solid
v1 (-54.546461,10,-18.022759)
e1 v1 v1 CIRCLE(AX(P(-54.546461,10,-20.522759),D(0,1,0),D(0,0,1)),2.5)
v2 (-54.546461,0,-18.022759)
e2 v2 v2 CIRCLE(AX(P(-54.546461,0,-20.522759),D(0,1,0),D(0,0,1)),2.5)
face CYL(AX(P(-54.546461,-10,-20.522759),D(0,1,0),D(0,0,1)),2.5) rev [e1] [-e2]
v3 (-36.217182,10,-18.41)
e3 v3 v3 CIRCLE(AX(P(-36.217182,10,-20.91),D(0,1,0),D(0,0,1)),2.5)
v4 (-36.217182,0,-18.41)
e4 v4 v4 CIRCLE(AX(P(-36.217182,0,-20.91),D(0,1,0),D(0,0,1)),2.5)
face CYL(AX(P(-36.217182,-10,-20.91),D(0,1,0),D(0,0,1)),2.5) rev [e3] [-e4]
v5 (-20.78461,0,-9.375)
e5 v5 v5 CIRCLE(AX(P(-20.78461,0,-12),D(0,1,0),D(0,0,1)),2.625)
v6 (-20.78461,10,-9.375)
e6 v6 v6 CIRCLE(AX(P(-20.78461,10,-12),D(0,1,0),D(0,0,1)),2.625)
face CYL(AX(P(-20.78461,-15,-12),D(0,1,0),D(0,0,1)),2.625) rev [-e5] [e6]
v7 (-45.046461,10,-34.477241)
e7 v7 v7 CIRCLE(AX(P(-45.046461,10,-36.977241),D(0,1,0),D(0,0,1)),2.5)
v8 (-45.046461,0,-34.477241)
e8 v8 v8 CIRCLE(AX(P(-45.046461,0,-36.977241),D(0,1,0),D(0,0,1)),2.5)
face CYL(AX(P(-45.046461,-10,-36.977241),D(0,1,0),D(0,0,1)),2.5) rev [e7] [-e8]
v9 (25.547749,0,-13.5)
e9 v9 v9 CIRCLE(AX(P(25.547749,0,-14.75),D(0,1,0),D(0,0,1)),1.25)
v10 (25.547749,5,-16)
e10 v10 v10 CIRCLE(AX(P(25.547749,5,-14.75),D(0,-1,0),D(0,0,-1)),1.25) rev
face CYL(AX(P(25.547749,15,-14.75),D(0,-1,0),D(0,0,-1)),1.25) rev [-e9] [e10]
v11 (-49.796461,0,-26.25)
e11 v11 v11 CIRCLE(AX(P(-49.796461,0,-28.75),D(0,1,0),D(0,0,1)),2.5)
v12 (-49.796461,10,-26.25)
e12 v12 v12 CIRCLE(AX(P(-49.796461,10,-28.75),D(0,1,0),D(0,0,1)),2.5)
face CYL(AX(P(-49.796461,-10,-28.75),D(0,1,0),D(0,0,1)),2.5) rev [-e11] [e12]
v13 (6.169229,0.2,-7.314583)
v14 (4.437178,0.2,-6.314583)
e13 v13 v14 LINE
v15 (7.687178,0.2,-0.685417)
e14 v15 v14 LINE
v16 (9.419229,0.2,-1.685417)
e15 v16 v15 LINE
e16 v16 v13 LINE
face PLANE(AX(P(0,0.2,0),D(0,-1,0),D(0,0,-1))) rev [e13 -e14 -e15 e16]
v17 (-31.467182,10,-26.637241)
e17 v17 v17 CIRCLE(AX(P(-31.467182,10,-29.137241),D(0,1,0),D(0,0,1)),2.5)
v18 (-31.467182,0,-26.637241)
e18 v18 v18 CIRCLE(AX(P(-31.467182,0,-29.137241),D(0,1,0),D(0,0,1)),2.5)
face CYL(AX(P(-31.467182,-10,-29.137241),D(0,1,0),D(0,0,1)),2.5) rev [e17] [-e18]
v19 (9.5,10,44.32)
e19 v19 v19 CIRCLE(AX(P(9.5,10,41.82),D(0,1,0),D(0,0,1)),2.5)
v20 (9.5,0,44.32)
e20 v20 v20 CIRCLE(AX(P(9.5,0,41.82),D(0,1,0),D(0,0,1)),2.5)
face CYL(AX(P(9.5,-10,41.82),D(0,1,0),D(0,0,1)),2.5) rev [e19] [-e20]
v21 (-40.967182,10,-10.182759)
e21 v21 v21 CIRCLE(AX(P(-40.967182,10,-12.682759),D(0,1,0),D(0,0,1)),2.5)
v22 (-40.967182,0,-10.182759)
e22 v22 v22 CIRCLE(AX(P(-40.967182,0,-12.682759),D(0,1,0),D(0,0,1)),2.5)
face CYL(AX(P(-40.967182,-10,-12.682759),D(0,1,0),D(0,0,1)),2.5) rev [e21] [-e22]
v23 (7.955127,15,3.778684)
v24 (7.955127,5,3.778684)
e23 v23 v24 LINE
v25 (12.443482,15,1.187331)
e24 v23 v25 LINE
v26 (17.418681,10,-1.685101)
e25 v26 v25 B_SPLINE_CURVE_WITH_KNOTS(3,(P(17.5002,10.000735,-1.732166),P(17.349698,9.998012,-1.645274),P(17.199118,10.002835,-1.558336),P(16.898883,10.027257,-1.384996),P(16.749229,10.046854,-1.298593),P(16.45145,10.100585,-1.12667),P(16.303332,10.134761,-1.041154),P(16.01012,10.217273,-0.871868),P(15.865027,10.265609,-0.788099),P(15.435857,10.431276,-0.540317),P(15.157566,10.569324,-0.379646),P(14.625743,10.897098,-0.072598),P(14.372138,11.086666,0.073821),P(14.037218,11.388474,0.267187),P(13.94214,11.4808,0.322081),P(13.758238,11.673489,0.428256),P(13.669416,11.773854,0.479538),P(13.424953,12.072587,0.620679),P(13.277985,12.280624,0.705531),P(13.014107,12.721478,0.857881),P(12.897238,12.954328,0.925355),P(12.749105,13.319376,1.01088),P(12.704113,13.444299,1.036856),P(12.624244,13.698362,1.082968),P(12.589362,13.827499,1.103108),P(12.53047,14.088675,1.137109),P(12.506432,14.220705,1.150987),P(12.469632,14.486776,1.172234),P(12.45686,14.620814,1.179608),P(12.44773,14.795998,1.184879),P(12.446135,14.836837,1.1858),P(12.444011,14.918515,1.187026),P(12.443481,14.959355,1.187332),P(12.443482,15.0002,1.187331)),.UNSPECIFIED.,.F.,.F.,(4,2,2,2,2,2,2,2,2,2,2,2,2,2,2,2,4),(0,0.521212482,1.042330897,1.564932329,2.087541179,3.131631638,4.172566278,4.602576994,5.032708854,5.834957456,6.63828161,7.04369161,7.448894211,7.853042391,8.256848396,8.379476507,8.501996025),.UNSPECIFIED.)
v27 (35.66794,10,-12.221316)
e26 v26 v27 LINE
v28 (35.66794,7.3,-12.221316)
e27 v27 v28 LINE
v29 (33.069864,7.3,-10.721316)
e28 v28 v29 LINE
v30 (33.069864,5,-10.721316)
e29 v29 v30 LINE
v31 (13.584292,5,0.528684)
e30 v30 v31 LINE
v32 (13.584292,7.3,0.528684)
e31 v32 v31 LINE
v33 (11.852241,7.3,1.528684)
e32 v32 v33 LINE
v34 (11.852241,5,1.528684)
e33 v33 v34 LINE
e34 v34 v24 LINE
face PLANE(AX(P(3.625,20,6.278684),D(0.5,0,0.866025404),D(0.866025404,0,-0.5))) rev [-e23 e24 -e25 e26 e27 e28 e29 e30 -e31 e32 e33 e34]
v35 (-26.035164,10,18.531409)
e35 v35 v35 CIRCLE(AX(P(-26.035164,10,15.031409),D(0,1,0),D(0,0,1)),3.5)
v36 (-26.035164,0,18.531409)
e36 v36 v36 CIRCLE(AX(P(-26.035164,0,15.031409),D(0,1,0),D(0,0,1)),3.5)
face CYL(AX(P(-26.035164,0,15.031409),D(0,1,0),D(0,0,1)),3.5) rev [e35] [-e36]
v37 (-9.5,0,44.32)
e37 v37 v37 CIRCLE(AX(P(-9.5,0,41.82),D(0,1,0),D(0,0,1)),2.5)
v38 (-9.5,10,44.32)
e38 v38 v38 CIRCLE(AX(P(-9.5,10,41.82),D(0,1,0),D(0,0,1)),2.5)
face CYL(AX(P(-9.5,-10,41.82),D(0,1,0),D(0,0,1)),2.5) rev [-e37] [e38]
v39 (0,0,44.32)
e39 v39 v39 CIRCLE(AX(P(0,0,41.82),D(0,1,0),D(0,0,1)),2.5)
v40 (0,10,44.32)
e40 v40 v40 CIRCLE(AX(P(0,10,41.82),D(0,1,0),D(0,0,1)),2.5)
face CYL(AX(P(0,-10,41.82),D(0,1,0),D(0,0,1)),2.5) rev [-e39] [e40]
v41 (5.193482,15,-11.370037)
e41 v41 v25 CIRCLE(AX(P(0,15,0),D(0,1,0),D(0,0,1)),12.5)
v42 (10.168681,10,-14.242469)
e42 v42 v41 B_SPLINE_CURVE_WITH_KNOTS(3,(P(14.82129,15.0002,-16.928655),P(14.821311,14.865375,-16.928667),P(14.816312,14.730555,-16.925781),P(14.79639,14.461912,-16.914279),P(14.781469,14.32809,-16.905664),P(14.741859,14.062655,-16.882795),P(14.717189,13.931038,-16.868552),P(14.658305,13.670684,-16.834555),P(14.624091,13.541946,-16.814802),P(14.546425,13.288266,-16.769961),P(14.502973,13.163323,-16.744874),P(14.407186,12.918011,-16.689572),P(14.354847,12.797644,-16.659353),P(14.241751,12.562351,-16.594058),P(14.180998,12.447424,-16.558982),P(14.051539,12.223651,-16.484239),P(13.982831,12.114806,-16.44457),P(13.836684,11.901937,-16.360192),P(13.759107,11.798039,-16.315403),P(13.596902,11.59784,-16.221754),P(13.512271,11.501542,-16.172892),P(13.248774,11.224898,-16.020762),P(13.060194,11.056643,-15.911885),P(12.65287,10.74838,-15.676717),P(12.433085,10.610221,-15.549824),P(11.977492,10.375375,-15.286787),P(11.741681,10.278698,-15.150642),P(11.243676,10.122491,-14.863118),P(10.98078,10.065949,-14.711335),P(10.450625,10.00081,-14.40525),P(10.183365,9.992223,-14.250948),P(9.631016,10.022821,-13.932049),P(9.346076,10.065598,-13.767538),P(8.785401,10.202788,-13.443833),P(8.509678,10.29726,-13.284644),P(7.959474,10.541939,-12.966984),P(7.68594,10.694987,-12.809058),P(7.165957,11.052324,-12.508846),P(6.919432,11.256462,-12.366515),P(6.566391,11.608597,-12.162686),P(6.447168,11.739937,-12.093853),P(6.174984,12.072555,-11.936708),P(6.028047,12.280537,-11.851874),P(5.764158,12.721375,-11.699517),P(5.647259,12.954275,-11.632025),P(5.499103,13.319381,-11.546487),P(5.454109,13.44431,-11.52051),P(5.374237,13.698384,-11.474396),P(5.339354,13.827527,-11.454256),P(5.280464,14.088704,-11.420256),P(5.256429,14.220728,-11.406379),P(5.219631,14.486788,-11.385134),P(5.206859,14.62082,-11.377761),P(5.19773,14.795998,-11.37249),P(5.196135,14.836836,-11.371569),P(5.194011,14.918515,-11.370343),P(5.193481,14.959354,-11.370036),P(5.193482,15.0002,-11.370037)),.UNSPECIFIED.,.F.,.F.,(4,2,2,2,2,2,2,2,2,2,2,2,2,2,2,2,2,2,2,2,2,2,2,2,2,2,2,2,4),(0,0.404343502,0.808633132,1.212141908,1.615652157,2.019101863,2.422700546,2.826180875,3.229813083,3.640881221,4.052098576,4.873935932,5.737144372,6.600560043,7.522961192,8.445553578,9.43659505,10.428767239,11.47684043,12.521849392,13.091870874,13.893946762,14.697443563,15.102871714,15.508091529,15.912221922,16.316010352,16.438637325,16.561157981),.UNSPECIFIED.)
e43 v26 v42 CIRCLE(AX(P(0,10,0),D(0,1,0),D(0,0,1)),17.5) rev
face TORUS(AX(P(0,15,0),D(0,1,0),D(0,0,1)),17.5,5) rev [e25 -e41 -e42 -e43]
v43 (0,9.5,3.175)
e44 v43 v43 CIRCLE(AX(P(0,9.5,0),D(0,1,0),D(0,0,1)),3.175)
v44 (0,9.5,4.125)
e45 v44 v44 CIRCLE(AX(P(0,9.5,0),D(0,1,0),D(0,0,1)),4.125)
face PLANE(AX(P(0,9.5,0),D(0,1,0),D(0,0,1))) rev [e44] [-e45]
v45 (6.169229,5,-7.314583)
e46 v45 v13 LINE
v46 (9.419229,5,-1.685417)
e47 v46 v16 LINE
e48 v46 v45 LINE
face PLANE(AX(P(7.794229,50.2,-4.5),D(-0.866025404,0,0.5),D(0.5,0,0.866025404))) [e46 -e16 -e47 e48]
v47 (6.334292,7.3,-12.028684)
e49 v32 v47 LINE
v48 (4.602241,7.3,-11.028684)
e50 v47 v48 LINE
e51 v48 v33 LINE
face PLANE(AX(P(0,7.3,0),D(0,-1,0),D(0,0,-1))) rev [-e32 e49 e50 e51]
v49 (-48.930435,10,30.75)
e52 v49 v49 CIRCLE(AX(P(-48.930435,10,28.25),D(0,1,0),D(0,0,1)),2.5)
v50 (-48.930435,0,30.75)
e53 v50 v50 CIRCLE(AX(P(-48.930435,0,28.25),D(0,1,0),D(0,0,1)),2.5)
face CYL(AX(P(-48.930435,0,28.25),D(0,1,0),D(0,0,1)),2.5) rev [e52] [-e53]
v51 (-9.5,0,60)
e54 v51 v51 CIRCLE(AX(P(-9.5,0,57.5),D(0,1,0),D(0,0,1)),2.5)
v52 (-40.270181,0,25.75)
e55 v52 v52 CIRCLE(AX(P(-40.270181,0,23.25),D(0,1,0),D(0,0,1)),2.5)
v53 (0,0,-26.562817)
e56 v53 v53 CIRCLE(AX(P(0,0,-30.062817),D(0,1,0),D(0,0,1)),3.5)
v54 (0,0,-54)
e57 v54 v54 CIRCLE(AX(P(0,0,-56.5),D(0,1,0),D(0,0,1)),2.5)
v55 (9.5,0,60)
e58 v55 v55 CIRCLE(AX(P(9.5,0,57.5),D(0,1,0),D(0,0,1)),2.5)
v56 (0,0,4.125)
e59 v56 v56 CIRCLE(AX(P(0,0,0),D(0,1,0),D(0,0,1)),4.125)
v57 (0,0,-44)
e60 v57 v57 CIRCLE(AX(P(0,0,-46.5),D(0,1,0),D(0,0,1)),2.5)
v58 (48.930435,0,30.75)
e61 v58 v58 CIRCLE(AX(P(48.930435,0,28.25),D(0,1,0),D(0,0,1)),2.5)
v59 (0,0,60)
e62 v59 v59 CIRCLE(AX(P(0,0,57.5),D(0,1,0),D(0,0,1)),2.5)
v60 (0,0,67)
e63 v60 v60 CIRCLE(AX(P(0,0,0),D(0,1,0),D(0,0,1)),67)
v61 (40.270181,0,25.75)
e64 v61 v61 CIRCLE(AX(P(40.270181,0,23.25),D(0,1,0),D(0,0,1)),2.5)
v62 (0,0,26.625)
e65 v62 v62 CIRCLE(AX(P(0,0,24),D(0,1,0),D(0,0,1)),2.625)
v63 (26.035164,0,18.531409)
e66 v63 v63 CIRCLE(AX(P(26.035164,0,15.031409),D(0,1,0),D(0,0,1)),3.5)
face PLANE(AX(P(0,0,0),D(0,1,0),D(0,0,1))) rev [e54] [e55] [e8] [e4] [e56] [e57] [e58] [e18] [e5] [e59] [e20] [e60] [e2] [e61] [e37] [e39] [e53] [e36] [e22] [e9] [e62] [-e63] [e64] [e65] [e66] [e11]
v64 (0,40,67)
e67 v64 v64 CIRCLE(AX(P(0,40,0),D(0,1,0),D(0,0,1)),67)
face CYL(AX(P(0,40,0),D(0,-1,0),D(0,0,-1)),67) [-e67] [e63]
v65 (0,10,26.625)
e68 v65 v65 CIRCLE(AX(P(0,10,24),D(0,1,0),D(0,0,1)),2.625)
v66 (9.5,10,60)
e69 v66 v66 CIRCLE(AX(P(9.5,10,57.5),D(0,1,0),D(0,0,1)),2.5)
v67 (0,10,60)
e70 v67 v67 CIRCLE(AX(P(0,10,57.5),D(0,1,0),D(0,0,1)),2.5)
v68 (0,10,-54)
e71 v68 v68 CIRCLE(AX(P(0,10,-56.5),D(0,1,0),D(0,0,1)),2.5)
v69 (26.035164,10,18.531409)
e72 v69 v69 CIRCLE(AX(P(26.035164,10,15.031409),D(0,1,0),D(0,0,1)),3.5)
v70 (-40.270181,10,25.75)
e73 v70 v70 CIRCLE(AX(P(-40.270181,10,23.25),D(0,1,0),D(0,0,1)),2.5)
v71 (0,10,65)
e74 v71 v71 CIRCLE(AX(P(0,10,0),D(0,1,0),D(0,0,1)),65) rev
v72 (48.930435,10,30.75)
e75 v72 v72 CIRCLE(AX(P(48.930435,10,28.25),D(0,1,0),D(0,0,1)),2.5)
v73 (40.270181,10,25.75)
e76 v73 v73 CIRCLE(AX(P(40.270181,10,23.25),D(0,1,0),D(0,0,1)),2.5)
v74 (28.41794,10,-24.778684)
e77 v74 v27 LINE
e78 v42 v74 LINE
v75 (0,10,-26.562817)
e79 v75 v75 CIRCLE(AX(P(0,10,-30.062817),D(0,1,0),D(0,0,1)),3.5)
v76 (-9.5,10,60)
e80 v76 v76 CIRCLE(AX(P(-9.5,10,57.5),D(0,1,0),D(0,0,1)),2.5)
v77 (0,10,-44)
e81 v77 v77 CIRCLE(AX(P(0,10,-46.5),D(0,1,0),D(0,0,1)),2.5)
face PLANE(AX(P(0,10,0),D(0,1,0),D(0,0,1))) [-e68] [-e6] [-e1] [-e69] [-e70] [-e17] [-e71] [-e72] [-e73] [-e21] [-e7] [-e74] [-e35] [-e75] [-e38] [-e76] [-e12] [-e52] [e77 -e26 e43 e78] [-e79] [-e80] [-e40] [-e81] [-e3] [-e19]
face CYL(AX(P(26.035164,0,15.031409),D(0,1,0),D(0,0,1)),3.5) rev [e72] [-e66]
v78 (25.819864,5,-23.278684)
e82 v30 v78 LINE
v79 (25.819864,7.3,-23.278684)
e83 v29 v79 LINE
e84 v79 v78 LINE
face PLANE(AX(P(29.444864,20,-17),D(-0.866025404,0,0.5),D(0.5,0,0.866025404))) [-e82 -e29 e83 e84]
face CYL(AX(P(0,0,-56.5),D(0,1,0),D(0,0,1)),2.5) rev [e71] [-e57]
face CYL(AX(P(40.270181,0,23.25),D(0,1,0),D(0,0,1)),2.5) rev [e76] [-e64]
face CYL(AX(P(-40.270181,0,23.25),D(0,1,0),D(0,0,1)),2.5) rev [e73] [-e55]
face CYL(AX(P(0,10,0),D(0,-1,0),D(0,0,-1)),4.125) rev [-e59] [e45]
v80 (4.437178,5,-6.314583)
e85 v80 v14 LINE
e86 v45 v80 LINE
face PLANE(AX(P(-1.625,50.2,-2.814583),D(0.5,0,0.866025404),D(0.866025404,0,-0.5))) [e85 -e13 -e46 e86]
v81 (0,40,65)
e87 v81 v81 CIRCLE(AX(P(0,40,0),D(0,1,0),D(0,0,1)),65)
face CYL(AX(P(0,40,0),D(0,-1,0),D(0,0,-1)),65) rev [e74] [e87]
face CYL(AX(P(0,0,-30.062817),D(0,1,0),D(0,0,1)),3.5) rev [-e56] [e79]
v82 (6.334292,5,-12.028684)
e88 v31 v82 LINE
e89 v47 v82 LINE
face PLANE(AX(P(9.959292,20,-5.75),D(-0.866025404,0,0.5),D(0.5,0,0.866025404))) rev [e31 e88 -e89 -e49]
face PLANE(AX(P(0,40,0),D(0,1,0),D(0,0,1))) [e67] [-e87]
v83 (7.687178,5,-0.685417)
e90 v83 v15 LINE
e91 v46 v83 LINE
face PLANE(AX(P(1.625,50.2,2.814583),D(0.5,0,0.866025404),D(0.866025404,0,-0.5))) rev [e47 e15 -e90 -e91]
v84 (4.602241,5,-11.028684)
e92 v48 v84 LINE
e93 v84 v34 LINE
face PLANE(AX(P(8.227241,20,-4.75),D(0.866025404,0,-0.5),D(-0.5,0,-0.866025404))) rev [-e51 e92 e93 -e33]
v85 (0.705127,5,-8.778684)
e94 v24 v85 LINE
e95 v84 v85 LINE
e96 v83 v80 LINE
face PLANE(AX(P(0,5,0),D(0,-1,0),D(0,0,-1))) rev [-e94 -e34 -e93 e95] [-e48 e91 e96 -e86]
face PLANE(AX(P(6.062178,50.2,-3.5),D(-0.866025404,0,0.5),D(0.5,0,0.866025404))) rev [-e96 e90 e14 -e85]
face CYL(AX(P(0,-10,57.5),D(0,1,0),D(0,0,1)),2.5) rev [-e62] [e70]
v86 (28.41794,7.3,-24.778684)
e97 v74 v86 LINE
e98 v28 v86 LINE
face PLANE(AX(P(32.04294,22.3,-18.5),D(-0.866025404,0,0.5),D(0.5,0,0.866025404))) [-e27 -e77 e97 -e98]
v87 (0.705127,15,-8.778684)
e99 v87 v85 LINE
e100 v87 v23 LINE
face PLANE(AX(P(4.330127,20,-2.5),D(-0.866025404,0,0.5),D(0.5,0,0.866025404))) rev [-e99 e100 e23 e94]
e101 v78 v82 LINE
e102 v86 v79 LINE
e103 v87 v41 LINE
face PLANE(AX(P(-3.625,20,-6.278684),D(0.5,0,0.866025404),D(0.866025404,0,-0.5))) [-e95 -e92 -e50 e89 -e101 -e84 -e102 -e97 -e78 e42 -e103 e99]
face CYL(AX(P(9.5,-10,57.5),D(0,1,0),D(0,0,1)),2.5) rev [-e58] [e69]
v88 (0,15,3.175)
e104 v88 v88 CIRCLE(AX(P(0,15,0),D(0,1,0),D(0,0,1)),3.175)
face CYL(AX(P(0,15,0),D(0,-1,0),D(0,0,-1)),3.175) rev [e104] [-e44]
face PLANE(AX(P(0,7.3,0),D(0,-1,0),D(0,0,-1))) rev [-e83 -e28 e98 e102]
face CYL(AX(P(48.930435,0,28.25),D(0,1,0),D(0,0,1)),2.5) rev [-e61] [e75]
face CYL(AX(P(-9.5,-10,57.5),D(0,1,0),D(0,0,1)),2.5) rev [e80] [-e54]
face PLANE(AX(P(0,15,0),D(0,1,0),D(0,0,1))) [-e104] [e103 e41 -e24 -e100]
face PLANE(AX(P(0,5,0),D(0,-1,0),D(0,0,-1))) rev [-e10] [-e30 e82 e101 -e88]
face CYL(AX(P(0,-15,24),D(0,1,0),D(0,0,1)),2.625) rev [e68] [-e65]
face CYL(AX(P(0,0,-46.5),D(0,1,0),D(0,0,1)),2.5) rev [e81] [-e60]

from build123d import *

# Parameters (mm, degrees)
BOSS_EXTRUDE7_DEPTH  = 10
SKETCH1_23_R         = 65.000000017
SKETCH1_23_R_2       = 4.125
BOSS_EXTRUDE8_DEPTH  = 10
CUT_EXTRUDE1_START   = 65
SKETCH16_R           = 2.5
CUT_EXTRUDE1_DEPTH   = 20
BOSS_EXTRUDE9_START  = -0.5
SKETCH17_R           = 12.5
SKETCH17_R_2         = 3.175
BOSS_EXTRUDE9_DEPTH  = 5.5
FILLET1_R            = 5
SKETCH18_R           = 2.5
SKETCH18_R_2         = 3.5
CUT_EXTRUDE2_DEPTH   = 10
SKETCH20_R           = 2.625
CUT_EXTRUDE11_DEPTH  = 25
SKETCH1_24_R         = 67
SKETCH1_24_R_2       = 66.5
BOSS_EXTRUDE10_DEPTH = 40
CUT_EXTRUDE12_START  = -0.2
CUT_EXTRUDE12_DEPTH  = 50
CUT_EXTRUDE13_START  = -5
SKETCH21_3_R         = 1.25
CUT_EXTRUDE13_DEPTH  = 15
CUT_EXTRUDE14_START  = -7.3
CUT_EXTRUDE14_DEPTH  = 15
SKETCH21_5_R         = 1.25
CUT_EXTRUDE15_DEPTH  = 15


with BuildPart() as part:
    # Sketch1 → Boss-Extrude7 (new body)
    with BuildSketch(Plane(origin=(0, 0, 0), x_dir=(1, 0, 0), z_dir=(0, 1, 0))):
        with BuildLine():
            ThreePointArc((-10.099280768, -64.210626285), (-56.291651246, -32.5), (-60.65767394, 23.359079438))
            Line((-60.65767394, 23.359079438), (-64.257390064, 17.124188218))
            ThreePointArc((-64.257390064, 17.124188218), (-57.590689352, -33.25), (-17.298713017, -64.210626285))
            Line((-17.298713017, -64.210626285), (-10.099280768, -64.210626285))
        make_face()
        with BuildLine():
            Line((-64.257390064, 17.124188218), (-60.65767394, 23.359079438))
            ThreePointArc((-60.65767394, 23.359079438), (-60.639599413, 23.405960416), (-60.621488653, 23.452827409))
            Line((-60.621488653, 23.452827409), (-61.93581913, 24.211656463))
            ThreePointArc((-61.93581913, 24.211656463), (-63.196040724, 20.700493636), (-64.257390064, 17.124188218))
        make_face()
        with BuildLine():
            ThreePointArc((-60.621488653, 23.452827409), (-59.667920988, 25.782536821), (-58.624860802, 28.073576473))
            ThreePointArc((-58.624860802, 28.073576473), (-54.991019149, 34.65527107), (-50.621488653, 40.773335485))
            Line((-50.621488653, 40.773335485), (-51.93581913, 41.532164539))
            ThreePointArc((-51.93581913, 41.532164539), (-57.590689352, 33.25), (-61.93581913, 24.211656463))
            Line((-61.93581913, 24.211656463), (-60.621488653, 23.452827409))
        make_face()
        with BuildLine():
            ThreePointArc((-50.621488653, 40.773335485), (-50.589956027, 40.812453359), (-50.558393172, 40.851546848))
            Line((-50.558393172, 40.851546848), (-46.958677048, 47.086438068))
            ThreePointArc((-46.958677048, 47.086438068), (-49.525173722, 44.379129868), (-51.93581913, 41.532164539))
            Line((-51.93581913, 41.532164539), (-50.621488653, 40.773335485))
        make_face()
        with BuildLine():
            Line((-46.958677048, 47.086438068), (-50.558393172, 40.851546848))
            ThreePointArc((-50.558393172, 40.851546848), (0, 65), (50.558393172, 40.851546848))
            Line((50.558393172, 40.851546848), (46.958677048, 47.086438068))
            ThreePointArc((46.958677048, 47.086438068), (0, 66.5), (-46.958677048, 47.086438068))
        make_face()
        with BuildLine():
            Line((46.958677048, 47.086438068), (50.558393172, 40.851546848))
            ThreePointArc((50.558393172, 40.851546848), (50.589956027, 40.812453359), (50.621488653, 40.773335485))
            Line((50.621488653, 40.773335485), (51.93581913, 41.532164539))
            ThreePointArc((51.93581913, 41.532164539), (49.525173722, 44.379129868), (46.958677048, 47.086438068))
        make_face()
        with BuildLine():
            Line((51.93581913, 41.532164539), (50.621488653, 40.773335485))
            ThreePointArc((50.621488653, 40.773335485), (52.162292355, 38.782666956), (53.624860802, 36.733830511))
            ThreePointArc((53.624860802, 36.733830511), (57.507854696, 30.295984028), (60.621488653, 23.452827409))
            Line((60.621488653, 23.452827409), (61.93581913, 24.211656463))
            ThreePointArc((61.93581913, 24.211656463), (57.590689352, 33.25), (51.93581913, 41.532164539))
        make_face()
        with BuildLine():
            ThreePointArc((64.257390064, 17.124188218), (63.196040724, 20.700493636), (61.93581913, 24.211656463))
            Line((61.93581913, 24.211656463), (60.621488653, 23.452827409))
            ThreePointArc((60.621488653, 23.452827409), (60.639599413, 23.405960416), (60.65767394, 23.359079438))
            Line((60.65767394, 23.359079438), (64.257390064, 17.124188218))
        make_face()
        with BuildLine():
            ThreePointArc((66.5, 0), (65.936963986, 8.635205867), (64.257390064, 17.124188218))
            Line((64.257390064, 17.124188218), (60.65767394, 23.359079438))
            ThreePointArc((60.65767394, 23.359079438), (63.90519856, 11.879629495), (65, 0))
            ThreePointArc((65, 0), (49.40371064, -42.240660211), (10.099280768, -64.210626285))
            Line((10.099280768, -64.210626285), (17.298713017, -64.210626285))
            ThreePointArc((17.298713017, -64.210626285), (52.785482927, -40.44678964), (66.5, 0))
        make_face()
        with BuildLine():
            ThreePointArc((-10, -64.226162893), (-10.049643386, -64.218413775), (-10.099280768, -64.210626285))
            Line((-10.099280768, -64.210626285), (-17.298713017, -64.210626285))
            ThreePointArc((-17.298713017, -64.210626285), (-13.670867002, -65.079623504), (-10, -65.743821002))
            Line((-10, -65.743821002), (-10, -64.226162893))
        make_face()
        with BuildLine():
            ThreePointArc((5, -64.807406984), (-2.516835548, -64.951255098), (-10, -64.226162893))
            Line((-10, -64.226162893), (-10, -65.743821002))
            ThreePointArc((-10, -65.743821002), (0, -66.5), (10, -65.743821002))
            Line((10, -65.743821002), (10, -64.226162893))
            ThreePointArc((10, -64.226162893), (7.505628633, -64.565203777), (5, -64.807406984))
        make_face()
        with BuildLine():
            Line((10, -64.226162893), (10, -65.743821002))
            ThreePointArc((10, -65.743821002), (13.670867002, -65.079623504), (17.298713017, -64.210626285))
            Line((17.298713017, -64.210626285), (10.099280768, -64.210626285))
            ThreePointArc((10.099280768, -64.210626285), (10.049643386, -64.218413775), (10, -64.226162893))
        make_face()
    extrude(amount=BOSS_EXTRUDE7_DEPTH)

    # Sketch1<23> → Boss-Extrude8 (add)
    with BuildSketch(Plane(origin=(0, 0, 0), x_dir=(1, 0, 0), z_dir=(0, 1, 0))):
        with Locations((-3e-09, 1.7e-08)):
            Circle(SKETCH1_23_R)
        with Locations(Location((0, 0, 0), (0, 0, 270))):
            Circle(SKETCH1_23_R_2, mode=Mode.SUBTRACT)
    extrude(amount=BOSS_EXTRUDE8_DEPTH)

    # Sketch16 → Cut-Extrude1 (cut)
    with BuildSketch(Plane.XZ.offset(-75).offset(CUT_EXTRUDE1_START)):
        with Locations(Location((-40.967182386, -12.682758664, 0), (0, 0, 90))):
            Circle(SKETCH16_R)
        with Locations(Location((-36.217182386, -20.91, 0), (0, 0, 90))):
            Circle(SKETCH16_R)
        with Locations(Location((-49.796460718, -28.75, 0), (0, 0, 90))):
            Circle(SKETCH16_R)
        with Locations(Location((0, 41.82, 0), (0, 0, 90))):
            Circle(SKETCH16_R)
        with Locations(Location((0, 57.5, 0), (0, 0, 90))):
            Circle(SKETCH16_R)
        with Locations(Location((-31.467182386, -29.137241336, 0), (0, 0, 90))):
            Circle(SKETCH16_R)
        with Locations(Location((-45.046460718, -36.977241336, 0), (0, 0, 90))):
            Circle(SKETCH16_R)
        with Locations(Location((-54.546460718, -20.522758664, 0), (0, 0, 90))):
            Circle(SKETCH16_R)
        with Locations(Location((9.5, 41.82, 0), (0, 0, 90))):
            Circle(SKETCH16_R)
        with Locations(Location((-9.5, 41.82, 0), (0, 0, 90))):
            Circle(SKETCH16_R)
        with Locations(Location((-9.5, 57.5, 0), (0, 0, 90))):
            Circle(SKETCH16_R)
        with Locations(Location((9.5, 57.5, 0), (0, 0, 90))):
            Circle(SKETCH16_R)
    extrude(amount=CUT_EXTRUDE1_DEPTH, mode=Mode.SUBTRACT)

    # Sketch17 → Boss-Extrude9 (add)
    with BuildSketch(Plane(origin=(0, 10, 0), x_dir=(1, 0, 0), z_dir=(0, 1, 0)).offset(BOSS_EXTRUDE9_START)):
        with Locations(Location((0, 0, 0), (0, 0, 270))):
            Circle(SKETCH17_R)
        with Locations(Location((0, 0, 0), (0, 0, 270))):
            Circle(SKETCH17_R_2, mode=Mode.SUBTRACT)
    extrude(amount=BOSS_EXTRUDE9_DEPTH)

    # Fillet1
    fillet1_edges = [part.edges().sort_by_distance(p)[0] for p in [
        (0, 10, -12.5),
    ]]
    fillet(fillet1_edges, radius=FILLET1_R - 0.0001)  # a hair under: the kernel refuses the full size

    # Sketch18 → Cut-Extrude2 (cut)
    with BuildSketch(Plane(origin=(0, 10, 0), x_dir=(1, 0, 0), z_dir=(0, 1, 0))):
        with Locations(Location((0, 56.5, 0), (0, 0, 270))):
            Circle(SKETCH18_R)
        with Locations(Location((0, 46.5, 0), (0, 0, 270))):
            Circle(SKETCH18_R)
        with Locations(Location((40.270181276, -23.25, 0), (0, 0, 270))):
            Circle(SKETCH18_R)
        with Locations(Location((48.930435314, -28.25, 0), (0, 0, 270))):
            Circle(SKETCH18_R)
        with Locations(Location((-40.270181276, -23.25, 0), (0, 0, 270))):
            Circle(SKETCH18_R)
        with Locations(Location((-48.930435314, -28.25, 0), (0, 0, 270))):
            Circle(SKETCH18_R)
        with Locations(Location((26.035163591, -15.031408708, 0), (0, 0, 270))):
            Circle(SKETCH18_R_2)
        with Locations(Location((-26.035163591, -15.031408708, 0), (0, 0, 270))):
            Circle(SKETCH18_R_2)
        with Locations(Location((0, 30.062817415, 0), (0, 0, 270))):
            Circle(SKETCH18_R_2)
    extrude(amount=-CUT_EXTRUDE2_DEPTH, mode=Mode.SUBTRACT)

    # Sketch20 → Cut-Extrude11 (cut)
    with BuildSketch(Plane(origin=(0, 10, 0), x_dir=(1, 0, 0), z_dir=(0, 1, 0))):
        with Locations(Location((-20.784609691, 12, 0), (0, 0, 270))):
            Circle(SKETCH20_R)
        with Locations(Location((0, -24, 0), (0, 0, 270))):
            Circle(SKETCH20_R)
    extrude(amount=-CUT_EXTRUDE11_DEPTH, mode=Mode.SUBTRACT)

    # Sketch1<24> → Boss-Extrude10 (add)
    # profile 1 of 13: a face of its own
    with BuildSketch(Plane(origin=(0, 0, 0), x_dir=(1, 0, 0), z_dir=(0, 1, 0))):
        with Locations(Location((0, 0, 0), (0, 0, 270))):
            Circle(SKETCH1_24_R)
        Circle(SKETCH1_24_R_2, mode=Mode.SUBTRACT)
    # profile 2 of 13: a face of its own
    with BuildSketch(Plane(origin=(0, 0, 0), x_dir=(1, 0, 0), z_dir=(0, 1, 0))):
        with BuildLine():
            ThreePointArc((-10.099280768, -64.210626285), (-56.291651246, -32.5), (-60.65767394, 23.359079438))
            Line((-60.65767394, 23.359079438), (-64.257390064, 17.124188218))
            ThreePointArc((-64.257390064, 17.124188218), (-57.590689352, -33.25), (-17.298713017, -64.210626285))
            Line((-17.298713017, -64.210626285), (-10.099280768, -64.210626285))
        make_face()
    # profile 3 of 13: a face of its own
    with BuildSketch(Plane(origin=(0, 0, 0), x_dir=(1, 0, 0), z_dir=(0, 1, 0))):
        with BuildLine():
            Line((-64.257390064, 17.124188218), (-60.65767394, 23.359079438))
            ThreePointArc((-60.65767394, 23.359079438), (-60.639599413, 23.405960416), (-60.621488653, 23.452827409))
            Line((-60.621488653, 23.452827409), (-61.93581913, 24.211656463))
            ThreePointArc((-61.93581913, 24.211656463), (-63.196040724, 20.700493636), (-64.257390064, 17.124188218))
        make_face()
    # profile 4 of 13: a face of its own
    with BuildSketch(Plane(origin=(0, 0, 0), x_dir=(1, 0, 0), z_dir=(0, 1, 0))):
        with BuildLine():
            ThreePointArc((-60.621488653, 23.452827409), (-59.667920988, 25.782536821), (-58.624860802, 28.073576473))
            ThreePointArc((-58.624860802, 28.073576473), (-54.991019149, 34.65527107), (-50.621488653, 40.773335485))
            Line((-50.621488653, 40.773335485), (-51.93581913, 41.532164539))
            ThreePointArc((-51.93581913, 41.532164539), (-57.590689352, 33.25), (-61.93581913, 24.211656463))
            Line((-61.93581913, 24.211656463), (-60.621488653, 23.452827409))
        make_face()
    # profile 5 of 13: a face of its own
    with BuildSketch(Plane(origin=(0, 0, 0), x_dir=(1, 0, 0), z_dir=(0, 1, 0))):
        with BuildLine():
            ThreePointArc((-50.621488653, 40.773335485), (-50.589956027, 40.812453359), (-50.558393172, 40.851546848))
            Line((-50.558393172, 40.851546848), (-46.958677048, 47.086438068))
            ThreePointArc((-46.958677048, 47.086438068), (-49.525173722, 44.379129868), (-51.93581913, 41.532164539))
            Line((-51.93581913, 41.532164539), (-50.621488653, 40.773335485))
        make_face()
    # profile 6 of 13: a face of its own
    with BuildSketch(Plane(origin=(0, 0, 0), x_dir=(1, 0, 0), z_dir=(0, 1, 0))):
        with BuildLine():
            Line((-46.958677048, 47.086438068), (-50.558393172, 40.851546848))
            ThreePointArc((-50.558393172, 40.851546848), (0, 65), (50.558393172, 40.851546848))
            Line((50.558393172, 40.851546848), (46.958677048, 47.086438068))
            ThreePointArc((46.958677048, 47.086438068), (0, 66.5), (-46.958677048, 47.086438068))
        make_face()
    # profile 7 of 13: a face of its own
    with BuildSketch(Plane(origin=(0, 0, 0), x_dir=(1, 0, 0), z_dir=(0, 1, 0))):
        with BuildLine():
            Line((46.958677048, 47.086438068), (50.558393172, 40.851546848))
            ThreePointArc((50.558393172, 40.851546848), (50.589956027, 40.812453359), (50.621488653, 40.773335485))
            Line((50.621488653, 40.773335485), (51.93581913, 41.532164539))
            ThreePointArc((51.93581913, 41.532164539), (49.525173722, 44.379129868), (46.958677048, 47.086438068))
        make_face()
    # profile 8 of 13: a face of its own
    with BuildSketch(Plane(origin=(0, 0, 0), x_dir=(1, 0, 0), z_dir=(0, 1, 0))):
        with BuildLine():
            Line((51.93581913, 41.532164539), (50.621488653, 40.773335485))
            ThreePointArc((50.621488653, 40.773335485), (52.162292355, 38.782666956), (53.624860802, 36.733830511))
            ThreePointArc((53.624860802, 36.733830511), (57.507854696, 30.295984028), (60.621488653, 23.452827409))
            Line((60.621488653, 23.452827409), (61.93581913, 24.211656463))
            ThreePointArc((61.93581913, 24.211656463), (57.590689352, 33.25), (51.93581913, 41.532164539))
        make_face()
    # profile 9 of 13: a face of its own
    with BuildSketch(Plane(origin=(0, 0, 0), x_dir=(1, 0, 0), z_dir=(0, 1, 0))):
        with BuildLine():
            ThreePointArc((64.257390064, 17.124188218), (63.196040724, 20.700493636), (61.93581913, 24.211656463))
            Line((61.93581913, 24.211656463), (60.621488653, 23.452827409))
            ThreePointArc((60.621488653, 23.452827409), (60.639599413, 23.405960416), (60.65767394, 23.359079438))
            Line((60.65767394, 23.359079438), (64.257390064, 17.124188218))
        make_face()
    # profile 10 of 13: a face of its own
    with BuildSketch(Plane(origin=(0, 0, 0), x_dir=(1, 0, 0), z_dir=(0, 1, 0))):
        with BuildLine():
            ThreePointArc((66.5, 0), (65.936963986, 8.635205867), (64.257390064, 17.124188218))
            Line((64.257390064, 17.124188218), (60.65767394, 23.359079438))
            ThreePointArc((60.65767394, 23.359079438), (63.90519856, 11.879629495), (65, 0))
            ThreePointArc((65, 0), (49.40371064, -42.240660211), (10.099280768, -64.210626285))
            Line((10.099280768, -64.210626285), (17.298713017, -64.210626285))
            ThreePointArc((17.298713017, -64.210626285), (52.785482927, -40.44678964), (66.5, 0))
        make_face()
    # profile 11 of 13: a face of its own
    with BuildSketch(Plane(origin=(0, 0, 0), x_dir=(1, 0, 0), z_dir=(0, 1, 0))):
        with BuildLine():
            Line((10, -64.226162893), (10, -65.743821002))
            ThreePointArc((10, -65.743821002), (13.670867002, -65.079623504), (17.298713017, -64.210626285))
            Line((17.298713017, -64.210626285), (10.099280768, -64.210626285))
            ThreePointArc((10.099280768, -64.210626285), (10.049643386, -64.218413775), (10, -64.226162893))
        make_face()
    # profile 12 of 13: a face of its own
    with BuildSketch(Plane(origin=(0, 0, 0), x_dir=(1, 0, 0), z_dir=(0, 1, 0))):
        with BuildLine():
            ThreePointArc((5, -64.807406984), (-2.516835548, -64.951255098), (-10, -64.226162893))
            Line((-10, -64.226162893), (-10, -65.743821002))
            ThreePointArc((-10, -65.743821002), (0, -66.5), (10, -65.743821002))
            Line((10, -65.743821002), (10, -64.226162893))
            ThreePointArc((10, -64.226162893), (7.505628633, -64.565203777), (5, -64.807406984))
        make_face()
    # profile 13 of 13: a face of its own
    with BuildSketch(Plane(origin=(0, 0, 0), x_dir=(1, 0, 0), z_dir=(0, 1, 0))):
        with BuildLine():
            ThreePointArc((-10, -64.226162893), (-10.049643386, -64.218413775), (-10.099280768, -64.210626285))
            Line((-10.099280768, -64.210626285), (-17.298713017, -64.210626285))
            ThreePointArc((-17.298713017, -64.210626285), (-13.670867002, -65.079623504), (-10, -65.743821002))
            Line((-10, -65.743821002), (-10, -64.226162893))
        make_face()
    extrude(amount=BOSS_EXTRUDE10_DEPTH)

    # Sketch21 → Cut-Extrude12 (cut)
    with BuildSketch(Plane.XZ.offset(CUT_EXTRUDE12_START)):
        with BuildLine():
            ThreePointArc((6.670582503, -2.446212189), (7.71570323, -2.636009989), (8.40263331, -3.446212189))
            Line((8.40263331, -3.446212189), (9.419228634, -1.685417438))
            Line((9.419228634, -1.685417438), (7.687177826, -0.685417438))
            Line((7.687177826, -0.685417438), (6.670582503, -2.446212189))
        make_face()
        with BuildLine():
            ThreePointArc((5.45377315, -4.553787811), (6.14070323, -5.363990011), (7.185823958, -5.553787811))
            Line((7.185823958, -5.553787811), (8.40263331, -3.446212189))
            ThreePointArc((8.40263331, -3.446212189), (7.71570323, -2.636009989), (6.670582503, -2.446212189))
            Line((6.670582503, -2.446212189), (5.45377315, -4.553787811))
        make_face()
        with BuildLine():
            Line((6.169228634, -7.314582562), (7.185823958, -5.553787811))
            ThreePointArc((7.185823958, -5.553787811), (6.14070323, -5.363990011), (5.45377315, -4.553787811))
            Line((5.45377315, -4.553787811), (4.437177826, -6.314582562))
            Line((4.437177826, -6.314582562), (6.169228634, -7.314582562))
        make_face()
    extrude(amount=-CUT_EXTRUDE12_DEPTH, mode=Mode.SUBTRACT)

    # Sketch21<3> → Cut-Extrude13 (cut)
    # profile 1 of 4: a face of its own
    with BuildSketch(Plane.XZ.offset(CUT_EXTRUDE13_START)):
        with BuildLine():
            Line((0.705127019, -8.778684177), (4.602241336, -11.028684177))
            Line((4.602241336, -11.028684177), (7.987124177, -5.165895119))
            ThreePointArc((7.987124177, -5.165895119), (7.614450766, -5.417635115), (7.185823958, -5.553787811))
            Line((7.185823958, -5.553787811), (6.169228634, -7.314582562))
            Line((6.169228634, -7.314582562), (4.437177826, -6.314582562))
            Line((4.437177826, -6.314582562), (5.45377315, -4.553787811))
            ThreePointArc((5.45377315, -4.553787811), (5.564213219, -3.2125), (6.670582503, -2.446212189))
            Line((6.670582503, -2.446212189), (7.687177826, -0.685417438))
            Line((7.687177826, -0.685417438), (9.419228634, -1.685417438))
            Line((9.419228634, -1.685417438), (8.40263331, -3.446212189))
            ThreePointArc((8.40263331, -3.446212189), (8.477856801, -3.718577165), (8.50320323, -4))
            ThreePointArc((8.50320323, -4), (8.494216407, -4.168011098), (8.467358495, -4.334104881))
            Line((8.467358495, -4.334104881), (11.852241336, 1.528684177))
            Line((11.852241336, 1.528684177), (7.955127019, 3.778684177))
            Line((7.955127019, 3.778684177), (0.705127019, -8.778684177))
        make_face()
    # profile 2 of 4: a face of its own
    with BuildSketch(Plane.XZ.offset(CUT_EXTRUDE13_START)):
        Polygon((6.334292144, -12.028684177), (25.819863729, -23.278684177), (33.069863729, -10.721315823), (13.584292144, 0.528684177), align=None)
        with Locations(Location((25.547749412, -14.75, 0), (0, 0, 270))):
            Circle(SKETCH21_3_R, mode=Mode.SUBTRACT)
    # profile 3 of 4: a face of its own
    with BuildSketch(Plane.XZ.offset(CUT_EXTRUDE13_START)):
        with BuildLine():
            ThreePointArc((6.670582503, -2.446212189), (5.564213219, -3.2125), (5.45377315, -4.553787811))
            Line((5.45377315, -4.553787811), (6.670582503, -2.446212189))
        make_face()
    # profile 4 of 4: a face of its own
    with BuildSketch(Plane.XZ.offset(CUT_EXTRUDE13_START)):
        with BuildLine():
            ThreePointArc((7.185823958, -5.553787811), (7.614450766, -5.417635115), (7.987124177, -5.165895119))
            Line((7.987124177, -5.165895119), (8.467358495, -4.334104881))
            ThreePointArc((8.467358495, -4.334104881), (8.494216407, -4.168011098), (8.50320323, -4))
            ThreePointArc((8.50320323, -4), (8.477856801, -3.718577165), (8.40263331, -3.446212189))
            Line((8.40263331, -3.446212189), (7.185823958, -5.553787811))
        make_face()
    extrude(amount=-CUT_EXTRUDE13_DEPTH, mode=Mode.SUBTRACT)

    # Sketch21<4> → Cut-Extrude14 (cut)
    with BuildSketch(Plane.XZ.offset(CUT_EXTRUDE14_START)):
        with BuildLine():
            Line((4.602241336, -11.028684177), (6.334292144, -12.028684177))
            Line((6.334292144, -12.028684177), (13.584292144, 0.528684177))
            Line((13.584292144, 0.528684177), (11.852241336, 1.528684177))
            Line((11.852241336, 1.528684177), (8.467358495, -4.334104881))
            ThreePointArc((8.467358495, -4.334104881), (8.292193241, -4.7875), (7.987124177, -5.165895119))
            Line((7.987124177, -5.165895119), (4.602241336, -11.028684177))
        make_face()
        Polygon((25.819863729, -23.278684177), (28.41793994, -24.778684177), (35.66793994, -12.221315823), (33.069863729, -10.721315823), align=None)
        with BuildLine():
            Line((8.467358495, -4.334104881), (7.987124177, -5.165895119))
            ThreePointArc((7.987124177, -5.165895119), (8.292193241, -4.7875), (8.467358495, -4.334104881))
        make_face()
    extrude(amount=-CUT_EXTRUDE14_DEPTH, mode=Mode.SUBTRACT)

    # Sketch21<5> → Cut-Extrude15 (cut)
    with BuildSketch(Plane.XZ):
        with Locations(Location((25.547749412, -14.75, 0), (0, 0, 270))):
            Circle(SKETCH21_5_R)
    extrude(amount=-CUT_EXTRUDE15_DEPTH, mode=Mode.SUBTRACT)


solid = part.part
